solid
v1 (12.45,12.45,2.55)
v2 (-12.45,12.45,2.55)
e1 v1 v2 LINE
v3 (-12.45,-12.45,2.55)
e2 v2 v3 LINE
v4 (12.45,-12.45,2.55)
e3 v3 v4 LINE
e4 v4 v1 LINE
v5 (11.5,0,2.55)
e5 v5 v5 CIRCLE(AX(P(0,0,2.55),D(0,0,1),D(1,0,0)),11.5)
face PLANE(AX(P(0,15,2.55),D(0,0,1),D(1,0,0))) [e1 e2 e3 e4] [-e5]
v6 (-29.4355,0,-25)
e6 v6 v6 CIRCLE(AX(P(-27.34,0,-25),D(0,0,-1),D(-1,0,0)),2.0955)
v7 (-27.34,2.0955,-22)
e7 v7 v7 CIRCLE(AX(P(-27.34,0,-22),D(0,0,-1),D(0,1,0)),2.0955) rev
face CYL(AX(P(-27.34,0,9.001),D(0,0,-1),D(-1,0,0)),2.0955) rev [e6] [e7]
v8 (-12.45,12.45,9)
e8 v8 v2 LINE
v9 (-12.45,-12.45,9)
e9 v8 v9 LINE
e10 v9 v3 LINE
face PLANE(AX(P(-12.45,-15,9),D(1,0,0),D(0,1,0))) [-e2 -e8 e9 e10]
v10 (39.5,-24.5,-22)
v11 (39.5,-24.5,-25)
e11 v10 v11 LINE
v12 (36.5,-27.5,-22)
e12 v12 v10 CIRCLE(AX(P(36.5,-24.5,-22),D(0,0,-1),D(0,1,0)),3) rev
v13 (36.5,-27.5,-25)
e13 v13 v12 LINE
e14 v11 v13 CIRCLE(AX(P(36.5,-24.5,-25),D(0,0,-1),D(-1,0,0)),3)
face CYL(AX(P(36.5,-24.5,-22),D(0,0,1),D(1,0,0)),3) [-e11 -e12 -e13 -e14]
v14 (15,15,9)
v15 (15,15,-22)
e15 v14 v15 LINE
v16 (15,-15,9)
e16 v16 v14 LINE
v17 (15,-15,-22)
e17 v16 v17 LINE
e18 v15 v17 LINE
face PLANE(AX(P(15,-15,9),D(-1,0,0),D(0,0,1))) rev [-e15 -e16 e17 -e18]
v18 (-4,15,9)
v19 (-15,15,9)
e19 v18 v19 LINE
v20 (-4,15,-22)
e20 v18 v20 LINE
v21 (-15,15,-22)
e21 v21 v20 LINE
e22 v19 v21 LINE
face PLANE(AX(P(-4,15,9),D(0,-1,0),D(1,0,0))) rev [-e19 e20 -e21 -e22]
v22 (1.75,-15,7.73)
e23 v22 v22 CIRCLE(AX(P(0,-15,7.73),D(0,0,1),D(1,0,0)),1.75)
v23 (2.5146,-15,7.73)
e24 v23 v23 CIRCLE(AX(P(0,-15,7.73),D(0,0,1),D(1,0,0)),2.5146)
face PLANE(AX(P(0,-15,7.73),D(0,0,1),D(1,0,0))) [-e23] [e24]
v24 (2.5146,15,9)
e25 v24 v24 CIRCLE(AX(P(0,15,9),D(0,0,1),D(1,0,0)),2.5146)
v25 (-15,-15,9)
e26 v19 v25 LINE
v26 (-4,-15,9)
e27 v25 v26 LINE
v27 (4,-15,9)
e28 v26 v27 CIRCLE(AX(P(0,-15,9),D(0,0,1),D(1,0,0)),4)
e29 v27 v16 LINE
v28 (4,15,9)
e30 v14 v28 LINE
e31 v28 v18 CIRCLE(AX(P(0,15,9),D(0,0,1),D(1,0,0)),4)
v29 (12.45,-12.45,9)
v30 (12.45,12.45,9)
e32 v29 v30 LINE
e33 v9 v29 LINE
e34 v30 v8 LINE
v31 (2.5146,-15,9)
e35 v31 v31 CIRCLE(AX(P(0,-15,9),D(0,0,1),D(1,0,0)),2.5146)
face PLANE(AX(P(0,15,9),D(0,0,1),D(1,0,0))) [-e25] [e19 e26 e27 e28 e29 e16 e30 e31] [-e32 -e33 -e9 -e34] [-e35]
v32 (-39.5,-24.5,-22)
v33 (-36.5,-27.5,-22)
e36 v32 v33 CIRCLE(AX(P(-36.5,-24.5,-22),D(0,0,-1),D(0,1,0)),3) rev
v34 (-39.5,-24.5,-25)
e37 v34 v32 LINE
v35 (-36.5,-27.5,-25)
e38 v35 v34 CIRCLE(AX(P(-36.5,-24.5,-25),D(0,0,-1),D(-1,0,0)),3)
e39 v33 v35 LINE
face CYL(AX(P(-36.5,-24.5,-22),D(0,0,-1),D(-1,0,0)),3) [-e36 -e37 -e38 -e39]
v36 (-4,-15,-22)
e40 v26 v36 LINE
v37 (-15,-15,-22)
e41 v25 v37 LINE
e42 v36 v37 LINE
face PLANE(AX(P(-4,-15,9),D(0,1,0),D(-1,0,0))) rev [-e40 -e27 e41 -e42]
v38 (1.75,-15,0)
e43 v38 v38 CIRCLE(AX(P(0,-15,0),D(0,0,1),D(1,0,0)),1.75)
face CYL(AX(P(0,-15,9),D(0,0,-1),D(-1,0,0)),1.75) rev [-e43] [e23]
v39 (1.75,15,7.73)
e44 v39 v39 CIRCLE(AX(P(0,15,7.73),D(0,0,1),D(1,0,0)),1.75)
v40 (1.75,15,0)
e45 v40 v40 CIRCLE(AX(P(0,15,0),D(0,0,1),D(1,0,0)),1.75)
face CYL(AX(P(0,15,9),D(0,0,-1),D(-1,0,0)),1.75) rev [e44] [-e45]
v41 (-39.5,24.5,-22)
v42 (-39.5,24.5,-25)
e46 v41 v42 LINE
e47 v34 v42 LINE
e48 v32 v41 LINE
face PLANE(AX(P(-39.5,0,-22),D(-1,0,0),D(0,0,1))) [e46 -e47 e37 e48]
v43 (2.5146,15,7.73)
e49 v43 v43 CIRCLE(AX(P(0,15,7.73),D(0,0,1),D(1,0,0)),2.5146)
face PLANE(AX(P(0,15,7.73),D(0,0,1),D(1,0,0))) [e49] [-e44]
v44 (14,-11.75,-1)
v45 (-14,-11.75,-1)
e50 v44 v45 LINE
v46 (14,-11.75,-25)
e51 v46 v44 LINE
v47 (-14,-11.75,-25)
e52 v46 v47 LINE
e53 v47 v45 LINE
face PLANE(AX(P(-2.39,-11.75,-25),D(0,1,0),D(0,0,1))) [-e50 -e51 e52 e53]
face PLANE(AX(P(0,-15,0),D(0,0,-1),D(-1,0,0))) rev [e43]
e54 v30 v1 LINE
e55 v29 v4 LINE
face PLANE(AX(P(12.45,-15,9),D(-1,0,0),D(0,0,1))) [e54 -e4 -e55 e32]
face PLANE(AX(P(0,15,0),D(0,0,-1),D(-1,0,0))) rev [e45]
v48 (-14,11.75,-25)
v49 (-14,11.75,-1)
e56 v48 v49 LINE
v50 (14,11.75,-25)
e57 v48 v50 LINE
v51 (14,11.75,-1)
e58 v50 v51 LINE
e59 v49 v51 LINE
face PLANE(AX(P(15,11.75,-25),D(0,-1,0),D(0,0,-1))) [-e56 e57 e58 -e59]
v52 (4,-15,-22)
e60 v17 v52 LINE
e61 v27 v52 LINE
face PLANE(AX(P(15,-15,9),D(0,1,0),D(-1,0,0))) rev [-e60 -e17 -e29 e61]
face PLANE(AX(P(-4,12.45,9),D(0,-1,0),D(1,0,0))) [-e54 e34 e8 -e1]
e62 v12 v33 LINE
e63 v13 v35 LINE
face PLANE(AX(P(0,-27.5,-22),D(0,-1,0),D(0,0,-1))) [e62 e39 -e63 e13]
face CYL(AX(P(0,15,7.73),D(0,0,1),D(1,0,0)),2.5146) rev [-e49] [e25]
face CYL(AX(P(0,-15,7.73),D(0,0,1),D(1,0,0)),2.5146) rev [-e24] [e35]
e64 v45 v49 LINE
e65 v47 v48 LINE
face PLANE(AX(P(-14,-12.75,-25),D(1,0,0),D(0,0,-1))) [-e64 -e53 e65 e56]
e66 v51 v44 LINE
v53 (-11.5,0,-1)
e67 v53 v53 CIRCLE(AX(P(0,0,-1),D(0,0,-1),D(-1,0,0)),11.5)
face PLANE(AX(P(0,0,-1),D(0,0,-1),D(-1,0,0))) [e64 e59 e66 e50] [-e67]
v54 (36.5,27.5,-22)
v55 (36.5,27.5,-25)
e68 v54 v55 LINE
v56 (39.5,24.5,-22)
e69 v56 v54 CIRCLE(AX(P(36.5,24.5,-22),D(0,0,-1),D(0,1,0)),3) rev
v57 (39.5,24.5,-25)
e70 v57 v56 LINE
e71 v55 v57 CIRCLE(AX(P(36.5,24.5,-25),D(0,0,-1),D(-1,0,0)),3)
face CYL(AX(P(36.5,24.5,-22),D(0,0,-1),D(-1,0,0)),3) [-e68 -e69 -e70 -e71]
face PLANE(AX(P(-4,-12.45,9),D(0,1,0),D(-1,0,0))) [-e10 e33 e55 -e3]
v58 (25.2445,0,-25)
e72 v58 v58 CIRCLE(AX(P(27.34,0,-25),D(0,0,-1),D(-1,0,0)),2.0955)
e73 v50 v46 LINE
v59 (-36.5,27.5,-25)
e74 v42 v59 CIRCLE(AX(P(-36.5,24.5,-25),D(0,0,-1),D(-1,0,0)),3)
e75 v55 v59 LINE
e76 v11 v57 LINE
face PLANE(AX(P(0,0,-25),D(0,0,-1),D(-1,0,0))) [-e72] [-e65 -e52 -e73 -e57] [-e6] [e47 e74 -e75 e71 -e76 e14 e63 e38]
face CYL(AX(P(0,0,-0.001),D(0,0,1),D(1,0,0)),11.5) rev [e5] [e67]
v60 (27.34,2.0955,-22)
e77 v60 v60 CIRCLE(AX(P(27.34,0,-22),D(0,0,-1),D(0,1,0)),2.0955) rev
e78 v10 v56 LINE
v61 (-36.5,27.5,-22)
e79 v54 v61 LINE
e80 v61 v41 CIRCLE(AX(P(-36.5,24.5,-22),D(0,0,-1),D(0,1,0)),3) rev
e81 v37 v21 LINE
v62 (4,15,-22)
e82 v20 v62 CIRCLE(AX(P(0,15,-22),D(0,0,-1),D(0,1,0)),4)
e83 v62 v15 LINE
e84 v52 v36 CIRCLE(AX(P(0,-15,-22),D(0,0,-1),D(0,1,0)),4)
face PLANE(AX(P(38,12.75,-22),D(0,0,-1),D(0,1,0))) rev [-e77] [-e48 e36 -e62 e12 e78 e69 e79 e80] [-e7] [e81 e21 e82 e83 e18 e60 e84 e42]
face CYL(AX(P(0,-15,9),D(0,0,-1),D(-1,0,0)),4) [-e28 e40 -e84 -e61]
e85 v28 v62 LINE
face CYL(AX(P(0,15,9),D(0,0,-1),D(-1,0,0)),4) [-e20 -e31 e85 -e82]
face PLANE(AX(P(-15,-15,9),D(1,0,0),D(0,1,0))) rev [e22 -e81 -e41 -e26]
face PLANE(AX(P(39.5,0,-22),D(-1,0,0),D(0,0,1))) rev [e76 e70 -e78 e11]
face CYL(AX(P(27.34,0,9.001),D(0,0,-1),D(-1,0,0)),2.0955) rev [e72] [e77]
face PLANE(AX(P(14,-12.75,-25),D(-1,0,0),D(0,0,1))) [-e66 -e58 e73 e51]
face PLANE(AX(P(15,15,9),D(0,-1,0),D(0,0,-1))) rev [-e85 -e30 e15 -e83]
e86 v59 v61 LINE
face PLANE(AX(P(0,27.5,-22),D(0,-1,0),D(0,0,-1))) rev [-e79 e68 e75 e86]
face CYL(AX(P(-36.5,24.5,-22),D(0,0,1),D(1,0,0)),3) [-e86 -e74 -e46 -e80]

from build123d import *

# Parameters (mm, degrees)
SKETCH1_R            = 1.75
BOSS_EXTRUDE1_DEPTH  = 9
SHELL2_START         = 2.55
SHELL2_OUTLINE_W     = 24.9
SHELL2_OUTLINE_H     = 24.9
SHELL2_DEPTH         = 6.45
CUT_EXTRUDE1_REACH   = 27.052
SKETCH6_R            = 11.5
BOSS_EXTRUDE5_DEPTH  = 25
SHELL7_T             = -1
CUT_EXTRUDE6_START   = -1
SKETCH12_R           = 11.5
CUT_EXTRUDE6_DEPTH   = 1
SKETCH19_W           = 3
SKETCH19_H           = 25.5
BOSS_EXTRUDE17_DEPTH = 23
SKETCH20_W           = 3
SKETCH20_H           = 25.5
BOSS_EXTRUDE18_DEPTH = 23
SKETCH21_W           = 79
SKETCH21_H           = 55
SKETCH21_W_2         = 76
SKETCH21_H_2         = 25.5
BOSS_EXTRUDE19_DEPTH = 3
FILLET1_R            = 3
SKETCH22_R           = 2.0955
CUT_EXTRUDE7_DEPTH   = 3
BOSS_EXTRUDE34_REACH = 56.236
SKETCH37_R           = 2.5146
CUT_EXTRUDE8_DEPTH   = 1.27


# Read off the part's stored shape, not the designer's step: Shell2
with BuildPart() as part:
    # Sketch1 → Boss-Extrude1 (new body)
    with BuildSketch(Plane.XY):
        with BuildLine():
            Line((15, 15), (4, 15))
            ThreePointArc((4, 15), (0, 19), (-4, 15))
            Line((-4, 15), (-15, 15))
            Line((-15, 15), (-15, -15))
            Line((-15, -15), (-4, -15))
            ThreePointArc((-4, -15), (0, -19), (4, -15))
            Line((4, -15), (15, -15))
            Line((15, -15), (15, 15))
        make_face()
        with Locations((0, -15)):
            Circle(SKETCH1_R, mode=Mode.SUBTRACT)
        with Locations((0, 15)):
            Circle(SKETCH1_R, mode=Mode.SUBTRACT)
    extrude(amount=BOSS_EXTRUDE1_DEPTH)

    # Shell2 outline → Shell2 (cut)
    with BuildSketch(Plane.XY.offset(SHELL2_START)):
        Rectangle(SHELL2_OUTLINE_W, SHELL2_OUTLINE_H)
    extrude(amount=SHELL2_DEPTH, mode=Mode.SUBTRACT)

    # Sketch6 → Cut-Extrude1 (cut, up to next)
    with BuildSketch(Plane.XY.offset(2.55), mode=Mode.PRIVATE) as cut_extrude1_sk1:
        Circle(SKETCH6_R)
    cut_extrude1_tool1 = extrude(cut_extrude1_sk1.sketch, amount=-CUT_EXTRUDE1_REACH, mode=Mode.PRIVATE) & part.part
    add(cut_extrude1_tool1.solids().sort_by_distance((0, 0, 2.55))[0], mode=Mode.SUBTRACT)


with BuildPart() as body_2:
    # Sketch11 → Boss-Extrude5 (new body)
    with BuildSketch(Plane(origin=(0, 0, 0), x_dir=(-1, 0, 0), z_dir=(0, 0, -1))):
        Polygon((-15, -12.75), (2.39, -12.75), (15, -12.75), (15, 12.75), (2.39, 12.75), (-15, 12.75), align=None)
    extrude(amount=BOSS_EXTRUDE5_DEPTH)

    # Shell7
    shell7_openings = [body_2.faces().sort_by_distance(p)[0] for p in [
        (0, 0, -25),
    ]]
    offset(amount=SHELL7_T, openings=shell7_openings, kind=Kind.INTERSECTION)

    # Sketch12 → Cut-Extrude6 (cut)
    with BuildSketch(Plane(origin=(0, 0, -1), x_dir=(-1, 0, 0), z_dir=(0, 0, -1)).offset(CUT_EXTRUDE6_START)):
        with Locations(Location((0, 0, 0), (0, 0, 180))):
            Circle(SKETCH12_R)
    extrude(amount=CUT_EXTRUDE6_DEPTH, mode=Mode.SUBTRACT)

    # Sketch19 → Boss-Extrude17 (add)
    with BuildSketch(Plane(origin=(15, 0, 0), x_dir=(0, 0, -1), z_dir=(1, 0, 0))):
        with Locations((23.5, 0)):
            Rectangle(SKETCH19_W, SKETCH19_H)
    extrude(amount=BOSS_EXTRUDE17_DEPTH)

    # Sketch20 → Boss-Extrude18 (add)
    with BuildSketch(Plane.ZY.offset(15)):
        with Locations((-23.5, 0)):
            Rectangle(SKETCH20_W, SKETCH20_H)
    extrude(amount=BOSS_EXTRUDE18_DEPTH)

    # Sketch21 → Boss-Extrude19 (add)
    with BuildSketch(Plane(origin=(0, 0, -25), x_dir=(-1, 0, 0), z_dir=(0, 0, -1))):
        Rectangle(SKETCH21_W, SKETCH21_H)
        Rectangle(SKETCH21_W_2, SKETCH21_H_2, mode=Mode.SUBTRACT)
    extrude(amount=-BOSS_EXTRUDE19_DEPTH)

    # Fillet1
    fillet1_edges = [body_2.edges().sort_by_distance(p)[0] for p in [
        (-39.5, -27.5, -23.5),
        (39.5, -27.5, -23.5),
        (39.5, 27.5, -23.5),
        (-39.5, 27.5, -23.5),
    ]]
    fillet(fillet1_edges, radius=FILLET1_R)

    # Sketch22 → Cut-Extrude7 (cut)
    with BuildSketch(Plane(origin=(0, 0, -25), x_dir=(-1, 0, 0), z_dir=(0, 0, -1))):
        with Locations((-27.34, 0)):
            Circle(SKETCH22_R)
        with Locations((27.34, 0)):
            Circle(SKETCH22_R)
    extrude(amount=-CUT_EXTRUDE7_DEPTH, mode=Mode.SUBTRACT)

    # Sketch31 → Boss-Extrude34 (add, up to next)
    with BuildSketch(Plane(origin=(0, 0, 0), x_dir=(-1, 0, 0), z_dir=(0, 0, -1)), mode=Mode.PRIVATE) as boss_extrude34_sk1:
        with BuildLine():
            Line((15, 15), (4, 15))
            ThreePointArc((4, 15), (0, 19), (-4, 15))
            Line((-4, 15), (-15, 15))
            Line((-15, 15), (-15, 12.75))
            Line((-15, 12.75), (15, 12.75))
            Line((15, 12.75), (15, 15))
        make_face()
    boss_extrude34_tool1 = extrude(boss_extrude34_sk1.sketch, amount=BOSS_EXTRUDE34_REACH, mode=Mode.PRIVATE) - body_2.part
    # Sketch31 → Boss-Extrude34 (add, up to next)
    with BuildSketch(Plane(origin=(0, 0, 0), x_dir=(-1, 0, 0), z_dir=(0, 0, -1)), mode=Mode.PRIVATE) as boss_extrude34_sk2:
        with BuildLine():
            Line((15, -12.75), (-15, -12.75))
            Line((-15, -12.75), (-15, -15))
            Line((-15, -15), (-4, -15))
            ThreePointArc((-4, -15), (0, -19), (4, -15))
            Line((4, -15), (15, -15))
            Line((15, -15), (15, -12.75))
        make_face()
    boss_extrude34_tool2 = extrude(boss_extrude34_sk2.sketch, amount=BOSS_EXTRUDE34_REACH, mode=Mode.PRIVATE) - body_2.part

    add(part.part)  # Boss-Extrude34 merges part
    add(boss_extrude34_tool1.solids().sort_by_distance((0, 14.640831, 0))[0])
    add(boss_extrude34_tool2.solids().sort_by_distance((0, -14.640831, 0))[0])

    # Sketch37 → Cut-Extrude8 (cut)
    with BuildSketch(Plane.XY.offset(9)):
        with Locations((0, 15)):
            Circle(SKETCH37_R)
        with Locations((0, -15)):
            Circle(SKETCH37_R)
    extrude(amount=-CUT_EXTRUDE8_DEPTH, mode=Mode.SUBTRACT)


solid = body_2.part
